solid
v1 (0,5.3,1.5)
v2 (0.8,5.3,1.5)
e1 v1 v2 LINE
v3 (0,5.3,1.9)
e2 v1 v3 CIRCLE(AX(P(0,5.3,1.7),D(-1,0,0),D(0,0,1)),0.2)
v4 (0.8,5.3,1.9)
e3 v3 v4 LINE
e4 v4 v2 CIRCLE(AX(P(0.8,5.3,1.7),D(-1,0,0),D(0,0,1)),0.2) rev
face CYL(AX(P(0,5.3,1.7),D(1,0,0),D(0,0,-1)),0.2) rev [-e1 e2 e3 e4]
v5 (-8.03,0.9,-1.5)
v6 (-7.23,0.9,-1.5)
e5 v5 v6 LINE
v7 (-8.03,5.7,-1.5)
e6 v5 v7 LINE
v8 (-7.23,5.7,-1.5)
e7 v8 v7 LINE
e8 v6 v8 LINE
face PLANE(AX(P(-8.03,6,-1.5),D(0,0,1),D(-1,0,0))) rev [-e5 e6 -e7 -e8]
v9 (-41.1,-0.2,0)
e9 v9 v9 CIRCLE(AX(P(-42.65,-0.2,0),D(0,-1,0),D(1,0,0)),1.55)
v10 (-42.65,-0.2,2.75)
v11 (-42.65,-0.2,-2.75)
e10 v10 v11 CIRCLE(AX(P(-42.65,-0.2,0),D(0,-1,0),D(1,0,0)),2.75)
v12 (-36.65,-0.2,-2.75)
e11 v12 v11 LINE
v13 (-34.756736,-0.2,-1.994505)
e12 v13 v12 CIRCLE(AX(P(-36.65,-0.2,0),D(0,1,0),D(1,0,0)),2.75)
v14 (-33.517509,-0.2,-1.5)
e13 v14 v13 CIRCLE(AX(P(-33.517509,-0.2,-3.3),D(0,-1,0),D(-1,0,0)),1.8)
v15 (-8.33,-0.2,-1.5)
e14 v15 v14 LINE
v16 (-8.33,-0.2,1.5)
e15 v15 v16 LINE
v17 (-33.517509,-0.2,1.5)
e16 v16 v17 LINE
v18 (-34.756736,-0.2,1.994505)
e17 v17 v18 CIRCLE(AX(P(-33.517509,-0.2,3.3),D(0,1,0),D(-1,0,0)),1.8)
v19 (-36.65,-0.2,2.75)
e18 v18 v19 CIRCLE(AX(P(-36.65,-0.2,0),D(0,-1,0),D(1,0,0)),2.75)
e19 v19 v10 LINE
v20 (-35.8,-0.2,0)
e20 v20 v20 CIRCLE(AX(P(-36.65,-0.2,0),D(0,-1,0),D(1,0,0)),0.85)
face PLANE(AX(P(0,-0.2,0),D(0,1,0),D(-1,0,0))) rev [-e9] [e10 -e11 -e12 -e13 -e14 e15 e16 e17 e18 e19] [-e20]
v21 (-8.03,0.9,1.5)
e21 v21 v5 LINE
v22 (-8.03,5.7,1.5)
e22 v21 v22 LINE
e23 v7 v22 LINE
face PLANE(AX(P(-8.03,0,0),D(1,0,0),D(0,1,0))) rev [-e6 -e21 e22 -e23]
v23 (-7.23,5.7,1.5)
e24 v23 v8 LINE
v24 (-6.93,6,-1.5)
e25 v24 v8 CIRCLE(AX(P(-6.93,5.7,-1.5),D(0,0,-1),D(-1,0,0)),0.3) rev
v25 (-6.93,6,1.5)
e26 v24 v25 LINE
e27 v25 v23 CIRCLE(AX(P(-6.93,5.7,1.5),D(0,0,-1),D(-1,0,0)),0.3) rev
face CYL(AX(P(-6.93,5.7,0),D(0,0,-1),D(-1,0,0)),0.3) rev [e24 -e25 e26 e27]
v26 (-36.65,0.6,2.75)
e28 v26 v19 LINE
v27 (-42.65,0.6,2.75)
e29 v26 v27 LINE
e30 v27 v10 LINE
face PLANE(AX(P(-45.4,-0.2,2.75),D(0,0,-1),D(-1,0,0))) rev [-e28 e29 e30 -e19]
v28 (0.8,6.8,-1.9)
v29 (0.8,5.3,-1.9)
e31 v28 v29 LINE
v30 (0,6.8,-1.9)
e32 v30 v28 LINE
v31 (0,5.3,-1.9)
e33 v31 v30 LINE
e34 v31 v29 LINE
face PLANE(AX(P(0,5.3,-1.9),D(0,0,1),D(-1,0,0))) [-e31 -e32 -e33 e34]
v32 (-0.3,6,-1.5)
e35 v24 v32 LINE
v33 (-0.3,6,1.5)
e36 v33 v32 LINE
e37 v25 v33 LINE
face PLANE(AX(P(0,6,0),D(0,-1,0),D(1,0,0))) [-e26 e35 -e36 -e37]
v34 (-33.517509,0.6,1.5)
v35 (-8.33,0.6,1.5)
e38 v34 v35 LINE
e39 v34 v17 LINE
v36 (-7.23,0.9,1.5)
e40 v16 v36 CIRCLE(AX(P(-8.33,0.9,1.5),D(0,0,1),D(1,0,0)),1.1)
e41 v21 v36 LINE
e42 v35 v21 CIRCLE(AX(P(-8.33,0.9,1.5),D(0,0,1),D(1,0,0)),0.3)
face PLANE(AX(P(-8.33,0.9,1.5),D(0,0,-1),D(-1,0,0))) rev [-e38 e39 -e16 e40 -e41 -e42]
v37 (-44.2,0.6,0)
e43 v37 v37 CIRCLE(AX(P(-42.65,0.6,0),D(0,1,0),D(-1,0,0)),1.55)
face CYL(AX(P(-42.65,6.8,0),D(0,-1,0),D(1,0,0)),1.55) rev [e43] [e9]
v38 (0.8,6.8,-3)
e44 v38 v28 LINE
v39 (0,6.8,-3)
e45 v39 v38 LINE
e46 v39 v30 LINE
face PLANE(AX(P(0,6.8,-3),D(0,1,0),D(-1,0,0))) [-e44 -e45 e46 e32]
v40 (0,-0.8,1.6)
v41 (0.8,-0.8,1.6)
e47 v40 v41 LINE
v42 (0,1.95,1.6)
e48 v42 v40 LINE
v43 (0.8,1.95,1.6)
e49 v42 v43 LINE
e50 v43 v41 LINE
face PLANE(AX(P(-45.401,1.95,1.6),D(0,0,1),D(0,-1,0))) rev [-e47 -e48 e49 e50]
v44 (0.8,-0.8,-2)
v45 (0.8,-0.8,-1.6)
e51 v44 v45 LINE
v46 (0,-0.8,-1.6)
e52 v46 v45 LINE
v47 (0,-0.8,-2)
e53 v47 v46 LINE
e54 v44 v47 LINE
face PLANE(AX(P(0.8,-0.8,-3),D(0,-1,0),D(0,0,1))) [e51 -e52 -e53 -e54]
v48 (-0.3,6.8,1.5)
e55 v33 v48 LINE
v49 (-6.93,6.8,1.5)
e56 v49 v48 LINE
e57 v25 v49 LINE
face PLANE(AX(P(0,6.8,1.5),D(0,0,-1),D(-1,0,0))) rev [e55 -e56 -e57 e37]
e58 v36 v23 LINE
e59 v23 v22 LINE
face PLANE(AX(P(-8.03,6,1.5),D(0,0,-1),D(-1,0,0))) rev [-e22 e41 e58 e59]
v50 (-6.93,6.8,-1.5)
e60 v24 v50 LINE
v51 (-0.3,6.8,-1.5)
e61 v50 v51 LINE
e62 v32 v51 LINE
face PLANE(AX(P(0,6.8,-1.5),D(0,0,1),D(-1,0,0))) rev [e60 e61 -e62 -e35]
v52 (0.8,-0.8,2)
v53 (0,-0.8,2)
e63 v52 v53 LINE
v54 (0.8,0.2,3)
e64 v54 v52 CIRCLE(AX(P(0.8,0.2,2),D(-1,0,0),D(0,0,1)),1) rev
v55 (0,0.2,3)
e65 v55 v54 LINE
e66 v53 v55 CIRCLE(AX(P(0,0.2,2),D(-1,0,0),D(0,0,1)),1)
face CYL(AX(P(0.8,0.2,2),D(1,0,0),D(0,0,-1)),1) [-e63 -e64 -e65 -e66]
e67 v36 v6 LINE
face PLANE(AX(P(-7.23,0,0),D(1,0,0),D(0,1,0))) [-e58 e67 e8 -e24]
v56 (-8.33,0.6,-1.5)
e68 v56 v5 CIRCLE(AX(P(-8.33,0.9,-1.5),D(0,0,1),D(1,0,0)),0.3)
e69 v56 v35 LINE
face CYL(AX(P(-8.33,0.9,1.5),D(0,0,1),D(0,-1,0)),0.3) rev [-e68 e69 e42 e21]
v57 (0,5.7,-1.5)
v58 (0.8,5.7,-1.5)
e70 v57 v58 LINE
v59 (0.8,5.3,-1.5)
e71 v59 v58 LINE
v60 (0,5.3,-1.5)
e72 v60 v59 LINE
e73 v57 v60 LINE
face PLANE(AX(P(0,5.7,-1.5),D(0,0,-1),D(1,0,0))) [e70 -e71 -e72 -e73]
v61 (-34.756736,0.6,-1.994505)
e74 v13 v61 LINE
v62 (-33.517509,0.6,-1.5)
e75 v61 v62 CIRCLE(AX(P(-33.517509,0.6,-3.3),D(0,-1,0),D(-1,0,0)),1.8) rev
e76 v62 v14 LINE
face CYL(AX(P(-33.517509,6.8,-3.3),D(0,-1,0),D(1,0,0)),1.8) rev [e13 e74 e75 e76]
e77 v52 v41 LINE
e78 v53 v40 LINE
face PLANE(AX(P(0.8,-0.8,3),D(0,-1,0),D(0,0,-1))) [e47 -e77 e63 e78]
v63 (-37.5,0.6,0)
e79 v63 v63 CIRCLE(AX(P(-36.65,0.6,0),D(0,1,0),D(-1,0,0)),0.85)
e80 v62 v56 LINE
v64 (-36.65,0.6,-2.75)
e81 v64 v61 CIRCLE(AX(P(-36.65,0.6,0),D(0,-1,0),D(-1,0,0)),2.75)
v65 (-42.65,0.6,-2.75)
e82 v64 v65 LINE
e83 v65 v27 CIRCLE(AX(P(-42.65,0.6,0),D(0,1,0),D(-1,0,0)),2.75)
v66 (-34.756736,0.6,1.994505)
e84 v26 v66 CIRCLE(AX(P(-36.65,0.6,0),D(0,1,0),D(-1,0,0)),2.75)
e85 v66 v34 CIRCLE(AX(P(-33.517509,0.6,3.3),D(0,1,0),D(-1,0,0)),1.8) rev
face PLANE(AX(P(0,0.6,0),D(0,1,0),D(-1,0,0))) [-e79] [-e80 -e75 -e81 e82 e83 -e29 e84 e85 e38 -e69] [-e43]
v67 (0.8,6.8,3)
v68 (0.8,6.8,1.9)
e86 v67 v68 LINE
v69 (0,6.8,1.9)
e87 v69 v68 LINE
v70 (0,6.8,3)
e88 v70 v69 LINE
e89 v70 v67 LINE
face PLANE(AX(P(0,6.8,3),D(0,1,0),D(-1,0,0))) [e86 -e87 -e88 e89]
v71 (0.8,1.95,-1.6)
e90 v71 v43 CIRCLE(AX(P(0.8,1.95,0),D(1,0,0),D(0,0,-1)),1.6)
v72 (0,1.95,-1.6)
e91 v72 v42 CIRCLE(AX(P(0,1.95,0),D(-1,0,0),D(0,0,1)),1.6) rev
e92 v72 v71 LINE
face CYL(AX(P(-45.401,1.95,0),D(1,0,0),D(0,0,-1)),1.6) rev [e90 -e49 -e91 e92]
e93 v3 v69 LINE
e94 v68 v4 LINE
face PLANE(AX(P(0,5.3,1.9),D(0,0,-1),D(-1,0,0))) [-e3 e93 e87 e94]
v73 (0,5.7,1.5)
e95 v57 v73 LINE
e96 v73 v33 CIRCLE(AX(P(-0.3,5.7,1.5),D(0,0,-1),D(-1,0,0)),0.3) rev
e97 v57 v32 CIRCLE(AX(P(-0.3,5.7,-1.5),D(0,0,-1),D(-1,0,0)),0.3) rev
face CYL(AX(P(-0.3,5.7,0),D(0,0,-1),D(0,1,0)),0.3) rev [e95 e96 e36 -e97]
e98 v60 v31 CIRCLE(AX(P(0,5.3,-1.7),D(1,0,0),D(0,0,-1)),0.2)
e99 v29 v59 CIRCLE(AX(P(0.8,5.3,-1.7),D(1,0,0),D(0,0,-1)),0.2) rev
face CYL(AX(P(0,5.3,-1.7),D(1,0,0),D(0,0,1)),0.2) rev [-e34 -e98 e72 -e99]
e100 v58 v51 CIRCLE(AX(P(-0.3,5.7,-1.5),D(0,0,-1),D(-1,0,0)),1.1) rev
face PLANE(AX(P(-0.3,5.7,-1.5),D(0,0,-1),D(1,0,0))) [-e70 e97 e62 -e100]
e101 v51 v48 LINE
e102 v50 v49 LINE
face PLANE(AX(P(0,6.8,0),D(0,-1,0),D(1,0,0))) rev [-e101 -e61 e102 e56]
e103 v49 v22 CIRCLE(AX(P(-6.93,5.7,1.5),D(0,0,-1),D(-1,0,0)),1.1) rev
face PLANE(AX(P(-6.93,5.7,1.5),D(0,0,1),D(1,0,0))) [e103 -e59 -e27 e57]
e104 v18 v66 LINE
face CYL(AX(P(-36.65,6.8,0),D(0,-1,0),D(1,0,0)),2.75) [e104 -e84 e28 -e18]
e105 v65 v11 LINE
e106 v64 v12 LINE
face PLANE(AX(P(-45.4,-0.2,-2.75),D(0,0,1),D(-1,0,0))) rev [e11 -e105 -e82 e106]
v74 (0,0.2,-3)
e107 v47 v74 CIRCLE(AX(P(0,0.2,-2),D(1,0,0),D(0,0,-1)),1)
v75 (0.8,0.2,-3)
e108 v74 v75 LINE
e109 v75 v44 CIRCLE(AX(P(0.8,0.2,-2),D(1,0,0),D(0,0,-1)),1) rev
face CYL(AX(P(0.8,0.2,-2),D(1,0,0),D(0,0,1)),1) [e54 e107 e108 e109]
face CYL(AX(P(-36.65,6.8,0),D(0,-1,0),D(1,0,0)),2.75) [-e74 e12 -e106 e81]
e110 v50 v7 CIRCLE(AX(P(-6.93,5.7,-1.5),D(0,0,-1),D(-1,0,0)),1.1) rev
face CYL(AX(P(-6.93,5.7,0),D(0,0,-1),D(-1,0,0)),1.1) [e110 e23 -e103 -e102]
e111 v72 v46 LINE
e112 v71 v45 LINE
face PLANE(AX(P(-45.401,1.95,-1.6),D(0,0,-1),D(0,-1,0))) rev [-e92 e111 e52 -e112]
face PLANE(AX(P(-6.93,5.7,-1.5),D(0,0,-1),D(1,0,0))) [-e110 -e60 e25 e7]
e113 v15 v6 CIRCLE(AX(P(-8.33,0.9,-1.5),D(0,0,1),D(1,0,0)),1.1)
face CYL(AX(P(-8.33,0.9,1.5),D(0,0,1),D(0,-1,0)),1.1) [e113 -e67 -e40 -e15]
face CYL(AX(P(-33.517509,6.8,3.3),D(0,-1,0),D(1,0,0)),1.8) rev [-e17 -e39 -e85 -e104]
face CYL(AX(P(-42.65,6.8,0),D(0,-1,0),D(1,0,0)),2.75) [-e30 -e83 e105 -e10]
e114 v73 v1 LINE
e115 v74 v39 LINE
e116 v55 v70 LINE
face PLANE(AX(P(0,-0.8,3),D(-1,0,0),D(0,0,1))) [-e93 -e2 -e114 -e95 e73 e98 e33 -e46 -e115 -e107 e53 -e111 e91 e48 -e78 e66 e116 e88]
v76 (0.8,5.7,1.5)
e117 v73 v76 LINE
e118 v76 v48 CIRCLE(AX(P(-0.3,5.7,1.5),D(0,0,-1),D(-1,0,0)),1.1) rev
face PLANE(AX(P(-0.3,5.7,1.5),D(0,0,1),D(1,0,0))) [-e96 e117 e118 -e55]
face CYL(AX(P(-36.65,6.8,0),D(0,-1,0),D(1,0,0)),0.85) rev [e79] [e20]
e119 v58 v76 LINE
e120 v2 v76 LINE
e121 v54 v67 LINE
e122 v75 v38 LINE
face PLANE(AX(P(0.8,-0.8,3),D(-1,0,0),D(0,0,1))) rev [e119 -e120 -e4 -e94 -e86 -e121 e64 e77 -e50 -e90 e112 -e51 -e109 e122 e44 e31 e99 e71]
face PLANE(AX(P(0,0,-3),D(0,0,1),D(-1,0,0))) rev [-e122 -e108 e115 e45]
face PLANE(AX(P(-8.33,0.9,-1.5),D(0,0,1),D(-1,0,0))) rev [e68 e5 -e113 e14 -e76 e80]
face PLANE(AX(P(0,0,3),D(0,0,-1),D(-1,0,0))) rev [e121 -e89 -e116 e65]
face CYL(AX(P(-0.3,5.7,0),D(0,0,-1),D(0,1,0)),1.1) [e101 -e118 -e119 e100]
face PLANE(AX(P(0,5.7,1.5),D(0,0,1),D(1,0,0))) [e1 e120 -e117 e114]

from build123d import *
from build123d.topology import SkipClean

# Parameters (mm, degrees)
SKETCH_20_W                      = 0.8
SKETCH_20_H                      = 7.6
SM_BASE_FLANGE_3_DEPTH           = 3
SM_EDGE_FLANGE_4_DEPTH           = 1.9
SM_EDGE_FLANGE_4_2_DEPTH         = 1.5
SM_EDGE_FLANGE_4_3_DEPTH         = 2
SM_EDGE_FLANGE_5_STRIP_W         = 3.8
SM_EDGE_FLANGE_5_STRIP_H         = 0.8
SM_EDGE_FLANGE_5_STRIP_CUT_DEPTH = 1.5
SM_EDGE_FLANGE_5_DEPTH           = 1.5
SM_EDGE_FLANGE_6_STRIP_W         = 3.8
SM_EDGE_FLANGE_6_STRIP_H         = 0.8
SM_EDGE_FLANGE_6_STRIP_CUT_DEPTH = 1.5
SM_EDGE_FLANGE_6_DEPTH           = 1.5
SM_EDGE_FLANGE_6_PROFILE_W       = 2.75
SM_EDGE_FLANGE_6_PROFILE_H       = 37.07
SM_EDGE_FLANGE_6_FLAT_DEPTH      = 0.8
CUT_EXTRUDE_3_DEPTH              = 47.034335012
CUT_EXTRUDE_4_REACH              = 48.794
FILLET_1_R                       = 1.8
FILLET_2_R                       = 1


with BuildPart() as part:
    # 基体-法兰3: sheet metal written as solids
    # 草图20 → 基体-法兰3 (new body)
    with BuildSketch(Plane.XY):
        with Locations((0.4, 3)):
            Rectangle(SKETCH_20_W, SKETCH_20_H)
    extrude(amount=SM_BASE_FLANGE_3_DEPTH)

    # 边线-法兰4: read off the stored shape, not the designer's step
    # 边线-法兰4 outline → 边线-法兰4 (cut)
    with BuildSketch(Plane.XY):
        with BuildLine():
            Line((0, 6.8), (0, 6.758300524))
            ThreePointArc((0, 6.758300524), (0.577496438, 6.363324958), (0.8, 5.7))
            Line((0.8, 5.7), (0.8, 6.8))
            Line((0.8, 6.8), (0, 6.8))
        make_face()
    extrude(amount=SM_EDGE_FLANGE_4_DEPTH, mode=Mode.SUBTRACT)

    # Sm Edge Flange 4 2 outline → Sm Edge Flange 4 2 (add)
    with BuildSketch(Plane.XY):
        with BuildLine():
            Line((-0.3, 6.8), (-8.03, 6.8))
            Line((-8.03, 6.8), (-8.03, 6))
            Line((-8.03, 6), (-0.3, 6))
            ThreePointArc((-0.3, 6), (-0.087867966, 5.912132034), (0, 5.7))
            Line((0, 5.7), (0, 6.758300524))
            ThreePointArc((0, 6.758300524), (-0.148557894, 6.789525258), (-0.3, 6.8))
        make_face()
    extrude(amount=SM_EDGE_FLANGE_4_2_DEPTH)

    # Sm Edge Flange 4 3 outline → Sm Edge Flange 4 3 (cut)
    with BuildSketch(Plane.YZ):
        with BuildLine():
            Line((5.3, 1.5), (8, 1.5))
            Line((8, 1.5), (8, 1.9))
            Line((8, 1.9), (5.3, 1.9))
            ThreePointArc((5.3, 1.9), (5.1, 1.7), (5.3, 1.5))
        make_face()
    extrude(amount=SM_EDGE_FLANGE_4_3_DEPTH, mode=Mode.SUBTRACT)

    # 边线-法兰5: sheet metal written as solids
    # 边线-法兰5 strip (on a plane across the edge) → 边线-法兰5 strip cut (cut)
    with BuildSketch(Plane(origin=(-8.03, 6, 1.5), x_dir=(1, 0, 0), z_dir=(0, 0, -1))):
        with Locations((-0.8, -0.4)):
            Rectangle(SM_EDGE_FLANGE_5_STRIP_W, SM_EDGE_FLANGE_5_STRIP_H)
    extrude(amount=SM_EDGE_FLANGE_5_STRIP_CUT_DEPTH, mode=Mode.SUBTRACT)

    # 边线-法兰5 section (on a plane across the edge) → 边线-法兰5 (add)
    with BuildSketch(Plane(origin=(-8.03, 6, 1.5), x_dir=(1, 0, 0), z_dir=(0, 0, -1))):
        with BuildLine():
            Line((0, 0.3), (0, 6.2))
            Line((0, 6.2), (0.8, 6.2))
            Line((0.8, 6.2), (0.8, 0.3))
            ThreePointArc((0.8, 0.3), (0.887867966, 0.087867966), (1.1, 0))
            Line((1.1, 0), (1.1, -0.8))
            ThreePointArc((1.1, -0.8), (0.322182541, -0.477817459), (0, 0.3))
        make_face()
    extrude(amount=SM_EDGE_FLANGE_5_DEPTH)

    # 边线-法兰6: sheet metal written as solids
    # 边线-法兰6 strip (on a plane across the edge) → 边线-法兰6 strip cut (cut)
    with BuildSketch(Plane(origin=(-8.03, -0.2, 0), x_dir=(0, 1, 0), z_dir=(0, 0, 1))):
        with Locations((-0.8, -0.4)):
            Rectangle(SM_EDGE_FLANGE_6_STRIP_W, SM_EDGE_FLANGE_6_STRIP_H)
    extrude(amount=SM_EDGE_FLANGE_6_STRIP_CUT_DEPTH, mode=Mode.SUBTRACT)

    # 边线-法兰6 bend section (on a plane across the edge) → 边线-法兰6 (add)
    with BuildSketch(Plane(origin=(-8.03, -0.2, 0), x_dir=(0, 1, 0), z_dir=(0, 0, 1))):
        with BuildLine():
            Line((0, 0.3), (0.8, 0.3))
            ThreePointArc((0.8, 0.3), (0.887867966, 0.087867966), (1.1, 0))
            Line((1.1, 0), (1.1, -0.8))
            ThreePointArc((1.1, -0.8), (0.322182541, -0.477817459), (0, 0.3))
        make_face()
    extrude(amount=SM_EDGE_FLANGE_6_DEPTH)

    # 边线-法兰6 profile (on flange) → 边线-法兰6 flat (add)
    with BuildSketch(Plane(origin=(-8.03, -0.2, 0), x_dir=(0, 0, 1), z_dir=(0, -1, 0))):
        with Locations((1.375, 18.835)):
            Rectangle(SM_EDGE_FLANGE_6_PROFILE_W, SM_EDGE_FLANGE_6_PROFILE_H)
    extrude(amount=-SM_EDGE_FLANGE_6_FLAT_DEPTH)

    # 草图37 → 切除-拉伸3 (cut, through all)
    with BuildSketch(Plane.XZ.offset(0.2)):
        with BuildLine():
            Line((-34.345113886, 1.5), (-8.33, 1.5))
            Line((-8.33, 1.5), (-8.33, 2.75))
            Line((-8.33, 2.75), (-36.65, 2.75))
            ThreePointArc((-36.65, 2.75), (-35.33898894, 2.417384951), (-34.345113886, 1.5))
        make_face()
        with BuildLine():
            Line((-37.5, 0), (-35.8, 0))
            ThreePointArc((-35.8, 0), (-36.65, 0.85), (-37.5, 0))
        make_face()
        with BuildLine():
            ThreePointArc((-45.4, 0), (-44.594543648, 1.944543648), (-42.65, 2.75))
            Line((-42.65, 2.75), (-45.4, 2.75))
            Line((-45.4, 2.75), (-45.4, 0))
        make_face()
        with BuildLine():
            Line((-44.2, 0), (-41.1, 0))
            ThreePointArc((-41.1, 0), (-42.65, 1.55), (-44.2, 0))
        make_face()
    extrude(amount=-CUT_EXTRUDE_3_DEPTH, mode=Mode.SUBTRACT)

    # 草图38 → 切除-拉伸4 (cut, up to next)
    with BuildSketch(Plane(origin=(0.8, 0, 0), x_dir=(0, 0, -1), z_dir=(1, 0, 0)), mode=Mode.PRIVATE) as cut_extrude_4_sk1:
        with BuildLine():
            Line((-1.6, 1.95), (-1.6, -0.8))
            Line((-1.6, -0.8), (0, -0.8))
            Line((0, -0.8), (0, 3.55))
            ThreePointArc((0, 3.55), (-1.13137085, 3.08137085), (-1.6, 1.95))
        make_face()
    cut_extrude_4_tool1 = extrude(cut_extrude_4_sk1.sketch, amount=-CUT_EXTRUDE_4_REACH, mode=Mode.PRIVATE) & part.part
    add(cut_extrude_4_tool1.solids().sort_by_distance((0.8, 1.219233, 0.762069))[0], mode=Mode.SUBTRACT)

    # 圆角1
    fillet_1_edges = [part.edges().sort_by_distance(p)[0] for p in [
        (-34.345113886, 0.2, 1.5),
    ]]
    fillet(fillet_1_edges, radius=FILLET_1_R)

    # 圆角2
    fillet_2_edges = [part.edges().sort_by_distance(p)[0] for p in [
        (0.4, -0.8, 3),
    ]]
    fillet(fillet_2_edges, radius=FILLET_2_R)

    # 镜向1: part across plane


with BuildPart() as part_1:
    with SkipClean():  # the faces are left unmerged after this step: merging them gives an invalid solid
        add(part.part)
        add(part.part.mirror(Plane(origin=(-8.03, -0.2, 0), x_dir=(1, 0, 0), z_dir=(0, 0, 1))))


solid = part_1.part
